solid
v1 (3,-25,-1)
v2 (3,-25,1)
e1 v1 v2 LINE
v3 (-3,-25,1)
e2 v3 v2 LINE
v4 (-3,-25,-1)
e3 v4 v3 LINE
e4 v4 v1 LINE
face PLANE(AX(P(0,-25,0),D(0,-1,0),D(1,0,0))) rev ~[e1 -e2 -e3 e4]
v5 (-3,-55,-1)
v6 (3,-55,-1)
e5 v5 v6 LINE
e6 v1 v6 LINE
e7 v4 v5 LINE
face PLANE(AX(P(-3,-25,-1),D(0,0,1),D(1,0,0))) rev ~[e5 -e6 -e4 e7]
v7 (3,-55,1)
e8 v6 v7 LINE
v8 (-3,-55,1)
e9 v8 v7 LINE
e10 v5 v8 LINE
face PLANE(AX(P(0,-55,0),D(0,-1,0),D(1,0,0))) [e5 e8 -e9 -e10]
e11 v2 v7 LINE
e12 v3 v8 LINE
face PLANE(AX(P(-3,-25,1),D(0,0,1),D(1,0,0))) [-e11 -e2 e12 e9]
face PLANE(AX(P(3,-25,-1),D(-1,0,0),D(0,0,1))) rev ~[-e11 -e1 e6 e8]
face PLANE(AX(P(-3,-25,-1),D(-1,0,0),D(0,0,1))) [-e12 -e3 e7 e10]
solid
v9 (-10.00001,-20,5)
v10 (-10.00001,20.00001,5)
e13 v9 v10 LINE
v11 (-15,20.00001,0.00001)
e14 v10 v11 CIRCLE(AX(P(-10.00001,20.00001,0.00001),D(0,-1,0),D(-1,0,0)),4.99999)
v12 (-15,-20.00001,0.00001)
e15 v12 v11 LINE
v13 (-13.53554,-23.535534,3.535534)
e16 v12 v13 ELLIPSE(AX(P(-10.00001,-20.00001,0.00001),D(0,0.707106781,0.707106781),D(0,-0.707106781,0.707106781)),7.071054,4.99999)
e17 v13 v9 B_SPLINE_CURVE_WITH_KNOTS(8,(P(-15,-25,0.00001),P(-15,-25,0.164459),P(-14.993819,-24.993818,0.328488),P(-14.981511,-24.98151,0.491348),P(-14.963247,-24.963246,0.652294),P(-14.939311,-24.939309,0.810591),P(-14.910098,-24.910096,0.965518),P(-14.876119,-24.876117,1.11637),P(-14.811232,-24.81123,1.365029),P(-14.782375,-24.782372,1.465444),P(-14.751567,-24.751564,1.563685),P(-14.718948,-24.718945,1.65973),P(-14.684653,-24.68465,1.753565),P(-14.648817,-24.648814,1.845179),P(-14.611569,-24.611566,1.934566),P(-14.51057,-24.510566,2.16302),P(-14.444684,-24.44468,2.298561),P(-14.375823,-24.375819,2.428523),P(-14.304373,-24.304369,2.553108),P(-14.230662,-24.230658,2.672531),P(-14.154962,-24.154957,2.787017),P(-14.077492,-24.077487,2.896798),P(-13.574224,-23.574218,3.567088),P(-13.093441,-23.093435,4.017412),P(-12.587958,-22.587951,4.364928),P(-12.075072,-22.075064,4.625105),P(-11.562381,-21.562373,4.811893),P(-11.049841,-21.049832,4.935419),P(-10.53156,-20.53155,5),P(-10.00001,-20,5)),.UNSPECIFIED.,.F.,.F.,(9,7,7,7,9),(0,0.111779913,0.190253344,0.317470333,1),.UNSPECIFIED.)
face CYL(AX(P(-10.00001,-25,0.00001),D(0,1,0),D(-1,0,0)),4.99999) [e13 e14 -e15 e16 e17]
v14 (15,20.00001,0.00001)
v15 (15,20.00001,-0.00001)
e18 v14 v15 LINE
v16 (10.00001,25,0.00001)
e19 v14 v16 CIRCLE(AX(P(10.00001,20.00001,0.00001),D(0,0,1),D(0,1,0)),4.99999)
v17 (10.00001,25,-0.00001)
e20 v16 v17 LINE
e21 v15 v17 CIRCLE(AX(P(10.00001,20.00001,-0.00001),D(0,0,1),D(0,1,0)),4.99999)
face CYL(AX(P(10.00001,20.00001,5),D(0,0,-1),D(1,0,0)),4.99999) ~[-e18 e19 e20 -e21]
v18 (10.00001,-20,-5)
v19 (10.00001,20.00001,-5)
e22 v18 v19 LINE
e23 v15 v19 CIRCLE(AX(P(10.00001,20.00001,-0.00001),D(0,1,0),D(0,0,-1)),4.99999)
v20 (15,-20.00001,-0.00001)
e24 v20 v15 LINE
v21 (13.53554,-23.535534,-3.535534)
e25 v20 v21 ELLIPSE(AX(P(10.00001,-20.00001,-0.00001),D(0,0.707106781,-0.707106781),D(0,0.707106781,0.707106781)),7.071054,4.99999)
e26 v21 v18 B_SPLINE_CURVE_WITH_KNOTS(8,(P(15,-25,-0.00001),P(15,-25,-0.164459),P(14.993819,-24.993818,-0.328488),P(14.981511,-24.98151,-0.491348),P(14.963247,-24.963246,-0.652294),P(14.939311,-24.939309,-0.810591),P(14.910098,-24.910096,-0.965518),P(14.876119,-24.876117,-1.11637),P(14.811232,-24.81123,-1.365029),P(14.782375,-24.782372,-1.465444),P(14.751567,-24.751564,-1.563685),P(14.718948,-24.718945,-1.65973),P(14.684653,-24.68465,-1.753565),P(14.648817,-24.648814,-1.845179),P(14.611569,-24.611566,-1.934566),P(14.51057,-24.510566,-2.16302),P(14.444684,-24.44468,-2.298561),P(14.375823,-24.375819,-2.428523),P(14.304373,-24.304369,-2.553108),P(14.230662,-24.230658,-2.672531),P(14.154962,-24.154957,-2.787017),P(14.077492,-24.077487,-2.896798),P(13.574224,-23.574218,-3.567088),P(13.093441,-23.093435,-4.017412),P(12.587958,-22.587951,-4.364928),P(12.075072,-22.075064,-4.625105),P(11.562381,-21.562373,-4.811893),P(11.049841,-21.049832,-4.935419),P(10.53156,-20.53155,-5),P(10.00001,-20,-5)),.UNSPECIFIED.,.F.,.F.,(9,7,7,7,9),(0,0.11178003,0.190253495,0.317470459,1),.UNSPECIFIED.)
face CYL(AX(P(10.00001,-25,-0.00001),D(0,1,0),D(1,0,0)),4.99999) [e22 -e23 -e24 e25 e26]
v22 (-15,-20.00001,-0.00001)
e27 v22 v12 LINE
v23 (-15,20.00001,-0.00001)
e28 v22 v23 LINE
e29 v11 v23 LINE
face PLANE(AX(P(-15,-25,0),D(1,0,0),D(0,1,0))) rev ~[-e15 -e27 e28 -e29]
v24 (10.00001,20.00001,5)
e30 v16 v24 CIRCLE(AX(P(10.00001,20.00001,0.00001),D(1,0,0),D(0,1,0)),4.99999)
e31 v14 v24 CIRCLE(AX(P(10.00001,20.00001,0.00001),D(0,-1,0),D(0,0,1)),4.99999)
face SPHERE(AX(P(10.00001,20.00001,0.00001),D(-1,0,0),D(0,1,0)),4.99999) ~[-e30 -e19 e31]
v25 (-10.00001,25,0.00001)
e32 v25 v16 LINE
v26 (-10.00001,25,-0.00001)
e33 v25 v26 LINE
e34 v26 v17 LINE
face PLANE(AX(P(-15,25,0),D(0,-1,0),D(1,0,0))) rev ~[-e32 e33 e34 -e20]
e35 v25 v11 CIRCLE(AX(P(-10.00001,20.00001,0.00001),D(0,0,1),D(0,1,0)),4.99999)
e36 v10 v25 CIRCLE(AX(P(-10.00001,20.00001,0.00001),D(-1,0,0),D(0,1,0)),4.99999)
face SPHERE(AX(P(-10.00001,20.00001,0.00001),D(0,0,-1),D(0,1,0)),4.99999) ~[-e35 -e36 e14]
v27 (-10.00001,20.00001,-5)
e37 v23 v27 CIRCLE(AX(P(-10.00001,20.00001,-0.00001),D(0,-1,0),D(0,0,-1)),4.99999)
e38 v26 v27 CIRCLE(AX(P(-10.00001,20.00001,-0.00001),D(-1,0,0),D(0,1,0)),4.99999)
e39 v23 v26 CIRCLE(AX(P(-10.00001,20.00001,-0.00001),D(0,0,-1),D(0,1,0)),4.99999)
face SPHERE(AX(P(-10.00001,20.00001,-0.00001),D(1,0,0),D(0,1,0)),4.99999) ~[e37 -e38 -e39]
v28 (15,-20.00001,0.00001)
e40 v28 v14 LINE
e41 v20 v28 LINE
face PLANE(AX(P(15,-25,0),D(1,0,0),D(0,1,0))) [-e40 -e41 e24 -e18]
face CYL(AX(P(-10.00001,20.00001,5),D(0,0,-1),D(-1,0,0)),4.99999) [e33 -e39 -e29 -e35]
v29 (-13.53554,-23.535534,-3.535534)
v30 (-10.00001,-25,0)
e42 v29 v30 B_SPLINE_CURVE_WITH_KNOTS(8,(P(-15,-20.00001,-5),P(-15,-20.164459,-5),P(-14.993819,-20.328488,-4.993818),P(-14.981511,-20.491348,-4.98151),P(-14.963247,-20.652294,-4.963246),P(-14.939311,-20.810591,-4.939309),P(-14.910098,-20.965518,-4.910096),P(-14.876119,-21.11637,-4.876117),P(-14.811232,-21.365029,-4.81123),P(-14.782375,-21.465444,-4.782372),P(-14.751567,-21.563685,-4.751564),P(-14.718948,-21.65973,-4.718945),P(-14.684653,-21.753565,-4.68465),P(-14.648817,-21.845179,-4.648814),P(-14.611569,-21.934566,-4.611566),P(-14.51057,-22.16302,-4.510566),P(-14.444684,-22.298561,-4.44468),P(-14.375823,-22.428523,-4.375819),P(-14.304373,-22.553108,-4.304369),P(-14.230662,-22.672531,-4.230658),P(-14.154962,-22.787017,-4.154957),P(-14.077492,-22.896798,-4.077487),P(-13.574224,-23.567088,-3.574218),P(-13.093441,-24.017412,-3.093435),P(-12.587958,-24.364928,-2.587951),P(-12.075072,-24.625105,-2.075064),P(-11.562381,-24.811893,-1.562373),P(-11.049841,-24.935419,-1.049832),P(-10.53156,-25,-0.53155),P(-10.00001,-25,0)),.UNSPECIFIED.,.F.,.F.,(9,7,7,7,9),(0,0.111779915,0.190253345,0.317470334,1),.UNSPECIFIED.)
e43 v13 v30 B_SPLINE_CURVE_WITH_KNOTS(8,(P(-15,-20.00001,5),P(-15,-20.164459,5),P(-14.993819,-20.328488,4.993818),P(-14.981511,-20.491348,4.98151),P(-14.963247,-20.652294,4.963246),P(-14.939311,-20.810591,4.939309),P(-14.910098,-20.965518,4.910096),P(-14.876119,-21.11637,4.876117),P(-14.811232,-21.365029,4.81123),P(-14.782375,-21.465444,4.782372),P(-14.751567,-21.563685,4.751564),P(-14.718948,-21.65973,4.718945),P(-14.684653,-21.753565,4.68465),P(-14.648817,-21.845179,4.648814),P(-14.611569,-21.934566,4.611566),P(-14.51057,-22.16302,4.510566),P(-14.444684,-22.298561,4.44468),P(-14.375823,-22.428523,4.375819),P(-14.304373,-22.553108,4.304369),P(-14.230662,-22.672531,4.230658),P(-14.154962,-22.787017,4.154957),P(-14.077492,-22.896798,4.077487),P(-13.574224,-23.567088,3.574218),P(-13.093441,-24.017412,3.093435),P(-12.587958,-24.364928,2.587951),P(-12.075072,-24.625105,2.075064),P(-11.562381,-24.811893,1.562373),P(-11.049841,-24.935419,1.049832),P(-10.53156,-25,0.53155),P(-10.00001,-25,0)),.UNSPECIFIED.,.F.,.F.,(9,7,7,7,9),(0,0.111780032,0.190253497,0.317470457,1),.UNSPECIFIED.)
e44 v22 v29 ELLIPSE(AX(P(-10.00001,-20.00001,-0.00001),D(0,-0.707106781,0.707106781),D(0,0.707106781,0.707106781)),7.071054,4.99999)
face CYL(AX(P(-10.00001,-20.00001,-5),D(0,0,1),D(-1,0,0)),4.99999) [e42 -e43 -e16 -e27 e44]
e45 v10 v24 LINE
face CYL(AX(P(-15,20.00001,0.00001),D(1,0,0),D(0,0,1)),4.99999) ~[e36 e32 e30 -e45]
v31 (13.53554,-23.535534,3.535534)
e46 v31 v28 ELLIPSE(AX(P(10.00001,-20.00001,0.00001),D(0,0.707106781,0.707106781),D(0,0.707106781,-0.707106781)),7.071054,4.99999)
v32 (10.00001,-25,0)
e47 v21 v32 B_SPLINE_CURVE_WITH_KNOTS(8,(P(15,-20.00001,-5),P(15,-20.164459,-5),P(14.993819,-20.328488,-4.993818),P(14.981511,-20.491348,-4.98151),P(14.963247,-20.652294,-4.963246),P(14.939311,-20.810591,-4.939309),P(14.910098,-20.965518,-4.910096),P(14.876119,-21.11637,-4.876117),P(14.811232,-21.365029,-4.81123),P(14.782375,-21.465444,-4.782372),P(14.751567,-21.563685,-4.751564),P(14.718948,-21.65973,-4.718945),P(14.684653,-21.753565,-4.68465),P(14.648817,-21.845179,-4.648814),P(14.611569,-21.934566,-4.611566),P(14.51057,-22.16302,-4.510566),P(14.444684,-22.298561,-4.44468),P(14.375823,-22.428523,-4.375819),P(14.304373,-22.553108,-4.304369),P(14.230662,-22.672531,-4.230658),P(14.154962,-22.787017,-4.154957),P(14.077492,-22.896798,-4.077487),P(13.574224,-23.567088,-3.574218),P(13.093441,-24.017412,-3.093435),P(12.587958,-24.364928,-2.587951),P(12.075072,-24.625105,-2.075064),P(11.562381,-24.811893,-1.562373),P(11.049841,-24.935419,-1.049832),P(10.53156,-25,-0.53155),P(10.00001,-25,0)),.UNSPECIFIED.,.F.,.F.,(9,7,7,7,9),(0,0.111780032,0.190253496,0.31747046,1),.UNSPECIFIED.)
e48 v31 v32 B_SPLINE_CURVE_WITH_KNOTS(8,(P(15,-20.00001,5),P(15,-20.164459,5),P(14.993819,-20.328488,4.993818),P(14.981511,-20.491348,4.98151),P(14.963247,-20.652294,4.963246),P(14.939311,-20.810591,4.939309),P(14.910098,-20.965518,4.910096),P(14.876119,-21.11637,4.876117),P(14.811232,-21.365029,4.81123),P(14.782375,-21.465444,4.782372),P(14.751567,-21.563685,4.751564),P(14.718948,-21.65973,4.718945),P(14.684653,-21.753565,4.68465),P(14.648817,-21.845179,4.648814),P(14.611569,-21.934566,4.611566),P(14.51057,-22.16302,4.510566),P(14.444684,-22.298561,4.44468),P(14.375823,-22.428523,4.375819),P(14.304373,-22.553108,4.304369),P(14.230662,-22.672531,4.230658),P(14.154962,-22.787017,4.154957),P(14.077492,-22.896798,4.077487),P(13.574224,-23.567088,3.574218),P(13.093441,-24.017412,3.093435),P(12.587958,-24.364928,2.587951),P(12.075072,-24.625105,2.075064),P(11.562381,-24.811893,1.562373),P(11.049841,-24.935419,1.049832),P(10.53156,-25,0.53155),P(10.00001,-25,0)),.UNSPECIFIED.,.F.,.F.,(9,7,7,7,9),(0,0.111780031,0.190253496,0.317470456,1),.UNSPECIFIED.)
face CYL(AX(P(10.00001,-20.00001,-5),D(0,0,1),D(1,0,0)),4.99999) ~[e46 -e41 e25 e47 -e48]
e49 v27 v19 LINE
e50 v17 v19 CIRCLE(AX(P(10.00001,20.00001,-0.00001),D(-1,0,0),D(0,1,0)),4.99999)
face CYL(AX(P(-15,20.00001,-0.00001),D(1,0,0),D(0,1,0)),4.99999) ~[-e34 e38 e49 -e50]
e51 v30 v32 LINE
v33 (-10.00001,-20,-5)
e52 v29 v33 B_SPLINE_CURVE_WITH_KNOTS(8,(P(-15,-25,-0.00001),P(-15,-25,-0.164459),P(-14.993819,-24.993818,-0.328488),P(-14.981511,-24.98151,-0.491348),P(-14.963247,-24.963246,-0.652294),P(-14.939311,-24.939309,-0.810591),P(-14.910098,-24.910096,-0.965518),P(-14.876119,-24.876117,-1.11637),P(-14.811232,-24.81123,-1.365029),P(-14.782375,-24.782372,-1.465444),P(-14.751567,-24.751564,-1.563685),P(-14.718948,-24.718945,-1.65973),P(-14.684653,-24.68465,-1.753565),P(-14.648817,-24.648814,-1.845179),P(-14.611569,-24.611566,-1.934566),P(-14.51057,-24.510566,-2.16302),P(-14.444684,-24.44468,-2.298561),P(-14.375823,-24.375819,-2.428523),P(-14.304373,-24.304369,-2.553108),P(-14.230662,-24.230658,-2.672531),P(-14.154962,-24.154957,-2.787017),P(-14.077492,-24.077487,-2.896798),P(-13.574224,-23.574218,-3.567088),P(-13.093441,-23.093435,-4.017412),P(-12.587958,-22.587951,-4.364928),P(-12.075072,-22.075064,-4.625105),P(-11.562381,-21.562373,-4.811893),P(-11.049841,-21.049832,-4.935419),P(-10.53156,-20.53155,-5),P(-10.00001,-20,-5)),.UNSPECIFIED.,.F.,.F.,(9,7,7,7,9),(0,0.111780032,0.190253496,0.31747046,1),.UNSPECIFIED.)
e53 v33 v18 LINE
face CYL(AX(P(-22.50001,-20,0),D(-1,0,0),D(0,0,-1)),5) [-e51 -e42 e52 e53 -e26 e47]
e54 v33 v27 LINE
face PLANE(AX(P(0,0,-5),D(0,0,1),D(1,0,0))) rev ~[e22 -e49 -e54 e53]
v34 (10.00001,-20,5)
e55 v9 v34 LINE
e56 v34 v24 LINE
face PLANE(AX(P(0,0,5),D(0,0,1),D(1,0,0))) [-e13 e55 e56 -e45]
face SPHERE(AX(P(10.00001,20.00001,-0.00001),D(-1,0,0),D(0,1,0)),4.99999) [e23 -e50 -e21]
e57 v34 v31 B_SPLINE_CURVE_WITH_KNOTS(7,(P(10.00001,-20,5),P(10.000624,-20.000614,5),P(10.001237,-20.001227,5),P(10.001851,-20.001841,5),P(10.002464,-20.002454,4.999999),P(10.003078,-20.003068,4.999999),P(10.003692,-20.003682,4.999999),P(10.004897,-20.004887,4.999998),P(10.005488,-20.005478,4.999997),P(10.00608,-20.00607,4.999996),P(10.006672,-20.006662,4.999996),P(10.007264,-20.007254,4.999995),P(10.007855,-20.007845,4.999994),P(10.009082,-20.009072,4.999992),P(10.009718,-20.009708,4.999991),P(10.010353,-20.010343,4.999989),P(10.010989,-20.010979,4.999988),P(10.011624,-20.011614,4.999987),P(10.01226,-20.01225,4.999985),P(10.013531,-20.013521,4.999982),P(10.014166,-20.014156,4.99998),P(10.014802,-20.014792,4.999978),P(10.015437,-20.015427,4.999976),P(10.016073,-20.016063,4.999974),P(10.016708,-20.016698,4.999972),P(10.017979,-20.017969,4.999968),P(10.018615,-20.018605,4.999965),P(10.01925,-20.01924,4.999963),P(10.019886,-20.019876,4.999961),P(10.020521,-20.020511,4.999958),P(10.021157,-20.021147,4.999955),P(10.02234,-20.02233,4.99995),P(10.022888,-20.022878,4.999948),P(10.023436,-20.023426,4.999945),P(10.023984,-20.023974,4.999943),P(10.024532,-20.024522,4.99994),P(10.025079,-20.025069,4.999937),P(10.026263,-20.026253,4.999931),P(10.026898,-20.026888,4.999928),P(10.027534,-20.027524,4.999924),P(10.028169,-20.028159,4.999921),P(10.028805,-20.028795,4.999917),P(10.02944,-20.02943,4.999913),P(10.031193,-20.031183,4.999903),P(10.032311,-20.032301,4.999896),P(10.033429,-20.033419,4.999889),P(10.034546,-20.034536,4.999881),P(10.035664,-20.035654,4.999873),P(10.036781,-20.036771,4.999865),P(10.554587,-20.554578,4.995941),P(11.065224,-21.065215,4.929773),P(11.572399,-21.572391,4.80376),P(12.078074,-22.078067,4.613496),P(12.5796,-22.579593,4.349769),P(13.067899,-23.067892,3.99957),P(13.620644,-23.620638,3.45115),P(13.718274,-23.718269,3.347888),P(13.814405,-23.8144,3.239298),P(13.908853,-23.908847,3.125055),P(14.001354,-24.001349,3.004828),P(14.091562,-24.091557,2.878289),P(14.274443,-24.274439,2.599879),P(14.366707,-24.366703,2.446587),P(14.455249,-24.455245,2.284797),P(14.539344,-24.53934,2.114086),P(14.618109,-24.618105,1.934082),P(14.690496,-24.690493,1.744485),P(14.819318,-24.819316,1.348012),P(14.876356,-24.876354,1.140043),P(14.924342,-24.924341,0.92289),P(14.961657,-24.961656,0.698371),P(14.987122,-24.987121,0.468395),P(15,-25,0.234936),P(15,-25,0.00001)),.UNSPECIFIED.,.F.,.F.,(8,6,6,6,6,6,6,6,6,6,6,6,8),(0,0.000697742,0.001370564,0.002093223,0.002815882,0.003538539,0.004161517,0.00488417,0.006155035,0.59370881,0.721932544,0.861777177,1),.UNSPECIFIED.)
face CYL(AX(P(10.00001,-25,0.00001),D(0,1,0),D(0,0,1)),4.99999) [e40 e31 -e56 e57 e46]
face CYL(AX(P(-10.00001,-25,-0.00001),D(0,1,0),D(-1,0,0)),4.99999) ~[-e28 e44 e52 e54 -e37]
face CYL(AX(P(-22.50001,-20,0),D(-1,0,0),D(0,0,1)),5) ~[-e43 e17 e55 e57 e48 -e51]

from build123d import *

# Parameters (mm, degrees)
F0_W        = 30
F0_H        = 50
F1_DEPTH    = 5
F2_R        = 4.99999
F3_W        = 6
F3_H        = 2
F4_DEPTH    = 30
F5_T1_DEPTH = 45.00002


# Not quite as in the source:
# - a fillet or chamfer that OpenCascade refuses, or shapes differently, is made with other operations: its cross-section is extruded or revolved along the edge and cut away or added
# - a fillet or chamfer is up to 0.001 mm smaller than in the source, because OpenCascade refuses the exact size


with BuildPart() as f1:
    # F0 (on Top) → F1 (new body, symmetric)
    with BuildSketch(Plane.XY):
        Rectangle(F0_W, F0_H)
    extrude(amount=F1_DEPTH, both=True)

    # F2 (radius 5 in the source; OpenCascade refuses exactly that, so slightly less here)
    f2_edges = [f1.edges().sort_by_distance(p)[0] for p in [
        (0, 25, -5),
        (-15, 25, 0),
        (0, 25, 5),
        (15, 25, 0),
        (-15, 0, -5),
        (-15, -25, 0),
        (-15, 0, 5),
        (15, 0, -5),
        (15, 0, 5),
        (15, -25, 0),
    ]]
    fillet(f2_edges, radius=F2_R)

    # F5: fillet of radius 5 on 8 edges, made by hand

    # F5_s2 → F5_t1 (cut)
    with BuildSketch(Plane.YZ.offset(-22.50001)):
        with BuildLine():
            ThreePointArc((-20, 5), (-23.5355339059, 3.5355339059), (-25, 0))
            Line((-25, 0), (-25, 5))
            Line((-25, 5), (-20, 5))
        make_face()
        with BuildLine():
            ThreePointArc((-20, -5), (-23.5355339059, -3.5355339059), (-25, 0))
            Line((-25, 0), (-25, -5))
            Line((-25, -5), (-20, -5))
        make_face()
    extrude(amount=F5_T1_DEPTH, mode=Mode.SUBTRACT)


with BuildPart() as f4:
    # F3 (on face) → F4 (new body)
    with BuildSketch(Plane.XZ.offset(25)):
        Rectangle(F3_W, F3_H)
    extrude(amount=F4_DEPTH)


solid = Compound([f1.part, f4.part])
